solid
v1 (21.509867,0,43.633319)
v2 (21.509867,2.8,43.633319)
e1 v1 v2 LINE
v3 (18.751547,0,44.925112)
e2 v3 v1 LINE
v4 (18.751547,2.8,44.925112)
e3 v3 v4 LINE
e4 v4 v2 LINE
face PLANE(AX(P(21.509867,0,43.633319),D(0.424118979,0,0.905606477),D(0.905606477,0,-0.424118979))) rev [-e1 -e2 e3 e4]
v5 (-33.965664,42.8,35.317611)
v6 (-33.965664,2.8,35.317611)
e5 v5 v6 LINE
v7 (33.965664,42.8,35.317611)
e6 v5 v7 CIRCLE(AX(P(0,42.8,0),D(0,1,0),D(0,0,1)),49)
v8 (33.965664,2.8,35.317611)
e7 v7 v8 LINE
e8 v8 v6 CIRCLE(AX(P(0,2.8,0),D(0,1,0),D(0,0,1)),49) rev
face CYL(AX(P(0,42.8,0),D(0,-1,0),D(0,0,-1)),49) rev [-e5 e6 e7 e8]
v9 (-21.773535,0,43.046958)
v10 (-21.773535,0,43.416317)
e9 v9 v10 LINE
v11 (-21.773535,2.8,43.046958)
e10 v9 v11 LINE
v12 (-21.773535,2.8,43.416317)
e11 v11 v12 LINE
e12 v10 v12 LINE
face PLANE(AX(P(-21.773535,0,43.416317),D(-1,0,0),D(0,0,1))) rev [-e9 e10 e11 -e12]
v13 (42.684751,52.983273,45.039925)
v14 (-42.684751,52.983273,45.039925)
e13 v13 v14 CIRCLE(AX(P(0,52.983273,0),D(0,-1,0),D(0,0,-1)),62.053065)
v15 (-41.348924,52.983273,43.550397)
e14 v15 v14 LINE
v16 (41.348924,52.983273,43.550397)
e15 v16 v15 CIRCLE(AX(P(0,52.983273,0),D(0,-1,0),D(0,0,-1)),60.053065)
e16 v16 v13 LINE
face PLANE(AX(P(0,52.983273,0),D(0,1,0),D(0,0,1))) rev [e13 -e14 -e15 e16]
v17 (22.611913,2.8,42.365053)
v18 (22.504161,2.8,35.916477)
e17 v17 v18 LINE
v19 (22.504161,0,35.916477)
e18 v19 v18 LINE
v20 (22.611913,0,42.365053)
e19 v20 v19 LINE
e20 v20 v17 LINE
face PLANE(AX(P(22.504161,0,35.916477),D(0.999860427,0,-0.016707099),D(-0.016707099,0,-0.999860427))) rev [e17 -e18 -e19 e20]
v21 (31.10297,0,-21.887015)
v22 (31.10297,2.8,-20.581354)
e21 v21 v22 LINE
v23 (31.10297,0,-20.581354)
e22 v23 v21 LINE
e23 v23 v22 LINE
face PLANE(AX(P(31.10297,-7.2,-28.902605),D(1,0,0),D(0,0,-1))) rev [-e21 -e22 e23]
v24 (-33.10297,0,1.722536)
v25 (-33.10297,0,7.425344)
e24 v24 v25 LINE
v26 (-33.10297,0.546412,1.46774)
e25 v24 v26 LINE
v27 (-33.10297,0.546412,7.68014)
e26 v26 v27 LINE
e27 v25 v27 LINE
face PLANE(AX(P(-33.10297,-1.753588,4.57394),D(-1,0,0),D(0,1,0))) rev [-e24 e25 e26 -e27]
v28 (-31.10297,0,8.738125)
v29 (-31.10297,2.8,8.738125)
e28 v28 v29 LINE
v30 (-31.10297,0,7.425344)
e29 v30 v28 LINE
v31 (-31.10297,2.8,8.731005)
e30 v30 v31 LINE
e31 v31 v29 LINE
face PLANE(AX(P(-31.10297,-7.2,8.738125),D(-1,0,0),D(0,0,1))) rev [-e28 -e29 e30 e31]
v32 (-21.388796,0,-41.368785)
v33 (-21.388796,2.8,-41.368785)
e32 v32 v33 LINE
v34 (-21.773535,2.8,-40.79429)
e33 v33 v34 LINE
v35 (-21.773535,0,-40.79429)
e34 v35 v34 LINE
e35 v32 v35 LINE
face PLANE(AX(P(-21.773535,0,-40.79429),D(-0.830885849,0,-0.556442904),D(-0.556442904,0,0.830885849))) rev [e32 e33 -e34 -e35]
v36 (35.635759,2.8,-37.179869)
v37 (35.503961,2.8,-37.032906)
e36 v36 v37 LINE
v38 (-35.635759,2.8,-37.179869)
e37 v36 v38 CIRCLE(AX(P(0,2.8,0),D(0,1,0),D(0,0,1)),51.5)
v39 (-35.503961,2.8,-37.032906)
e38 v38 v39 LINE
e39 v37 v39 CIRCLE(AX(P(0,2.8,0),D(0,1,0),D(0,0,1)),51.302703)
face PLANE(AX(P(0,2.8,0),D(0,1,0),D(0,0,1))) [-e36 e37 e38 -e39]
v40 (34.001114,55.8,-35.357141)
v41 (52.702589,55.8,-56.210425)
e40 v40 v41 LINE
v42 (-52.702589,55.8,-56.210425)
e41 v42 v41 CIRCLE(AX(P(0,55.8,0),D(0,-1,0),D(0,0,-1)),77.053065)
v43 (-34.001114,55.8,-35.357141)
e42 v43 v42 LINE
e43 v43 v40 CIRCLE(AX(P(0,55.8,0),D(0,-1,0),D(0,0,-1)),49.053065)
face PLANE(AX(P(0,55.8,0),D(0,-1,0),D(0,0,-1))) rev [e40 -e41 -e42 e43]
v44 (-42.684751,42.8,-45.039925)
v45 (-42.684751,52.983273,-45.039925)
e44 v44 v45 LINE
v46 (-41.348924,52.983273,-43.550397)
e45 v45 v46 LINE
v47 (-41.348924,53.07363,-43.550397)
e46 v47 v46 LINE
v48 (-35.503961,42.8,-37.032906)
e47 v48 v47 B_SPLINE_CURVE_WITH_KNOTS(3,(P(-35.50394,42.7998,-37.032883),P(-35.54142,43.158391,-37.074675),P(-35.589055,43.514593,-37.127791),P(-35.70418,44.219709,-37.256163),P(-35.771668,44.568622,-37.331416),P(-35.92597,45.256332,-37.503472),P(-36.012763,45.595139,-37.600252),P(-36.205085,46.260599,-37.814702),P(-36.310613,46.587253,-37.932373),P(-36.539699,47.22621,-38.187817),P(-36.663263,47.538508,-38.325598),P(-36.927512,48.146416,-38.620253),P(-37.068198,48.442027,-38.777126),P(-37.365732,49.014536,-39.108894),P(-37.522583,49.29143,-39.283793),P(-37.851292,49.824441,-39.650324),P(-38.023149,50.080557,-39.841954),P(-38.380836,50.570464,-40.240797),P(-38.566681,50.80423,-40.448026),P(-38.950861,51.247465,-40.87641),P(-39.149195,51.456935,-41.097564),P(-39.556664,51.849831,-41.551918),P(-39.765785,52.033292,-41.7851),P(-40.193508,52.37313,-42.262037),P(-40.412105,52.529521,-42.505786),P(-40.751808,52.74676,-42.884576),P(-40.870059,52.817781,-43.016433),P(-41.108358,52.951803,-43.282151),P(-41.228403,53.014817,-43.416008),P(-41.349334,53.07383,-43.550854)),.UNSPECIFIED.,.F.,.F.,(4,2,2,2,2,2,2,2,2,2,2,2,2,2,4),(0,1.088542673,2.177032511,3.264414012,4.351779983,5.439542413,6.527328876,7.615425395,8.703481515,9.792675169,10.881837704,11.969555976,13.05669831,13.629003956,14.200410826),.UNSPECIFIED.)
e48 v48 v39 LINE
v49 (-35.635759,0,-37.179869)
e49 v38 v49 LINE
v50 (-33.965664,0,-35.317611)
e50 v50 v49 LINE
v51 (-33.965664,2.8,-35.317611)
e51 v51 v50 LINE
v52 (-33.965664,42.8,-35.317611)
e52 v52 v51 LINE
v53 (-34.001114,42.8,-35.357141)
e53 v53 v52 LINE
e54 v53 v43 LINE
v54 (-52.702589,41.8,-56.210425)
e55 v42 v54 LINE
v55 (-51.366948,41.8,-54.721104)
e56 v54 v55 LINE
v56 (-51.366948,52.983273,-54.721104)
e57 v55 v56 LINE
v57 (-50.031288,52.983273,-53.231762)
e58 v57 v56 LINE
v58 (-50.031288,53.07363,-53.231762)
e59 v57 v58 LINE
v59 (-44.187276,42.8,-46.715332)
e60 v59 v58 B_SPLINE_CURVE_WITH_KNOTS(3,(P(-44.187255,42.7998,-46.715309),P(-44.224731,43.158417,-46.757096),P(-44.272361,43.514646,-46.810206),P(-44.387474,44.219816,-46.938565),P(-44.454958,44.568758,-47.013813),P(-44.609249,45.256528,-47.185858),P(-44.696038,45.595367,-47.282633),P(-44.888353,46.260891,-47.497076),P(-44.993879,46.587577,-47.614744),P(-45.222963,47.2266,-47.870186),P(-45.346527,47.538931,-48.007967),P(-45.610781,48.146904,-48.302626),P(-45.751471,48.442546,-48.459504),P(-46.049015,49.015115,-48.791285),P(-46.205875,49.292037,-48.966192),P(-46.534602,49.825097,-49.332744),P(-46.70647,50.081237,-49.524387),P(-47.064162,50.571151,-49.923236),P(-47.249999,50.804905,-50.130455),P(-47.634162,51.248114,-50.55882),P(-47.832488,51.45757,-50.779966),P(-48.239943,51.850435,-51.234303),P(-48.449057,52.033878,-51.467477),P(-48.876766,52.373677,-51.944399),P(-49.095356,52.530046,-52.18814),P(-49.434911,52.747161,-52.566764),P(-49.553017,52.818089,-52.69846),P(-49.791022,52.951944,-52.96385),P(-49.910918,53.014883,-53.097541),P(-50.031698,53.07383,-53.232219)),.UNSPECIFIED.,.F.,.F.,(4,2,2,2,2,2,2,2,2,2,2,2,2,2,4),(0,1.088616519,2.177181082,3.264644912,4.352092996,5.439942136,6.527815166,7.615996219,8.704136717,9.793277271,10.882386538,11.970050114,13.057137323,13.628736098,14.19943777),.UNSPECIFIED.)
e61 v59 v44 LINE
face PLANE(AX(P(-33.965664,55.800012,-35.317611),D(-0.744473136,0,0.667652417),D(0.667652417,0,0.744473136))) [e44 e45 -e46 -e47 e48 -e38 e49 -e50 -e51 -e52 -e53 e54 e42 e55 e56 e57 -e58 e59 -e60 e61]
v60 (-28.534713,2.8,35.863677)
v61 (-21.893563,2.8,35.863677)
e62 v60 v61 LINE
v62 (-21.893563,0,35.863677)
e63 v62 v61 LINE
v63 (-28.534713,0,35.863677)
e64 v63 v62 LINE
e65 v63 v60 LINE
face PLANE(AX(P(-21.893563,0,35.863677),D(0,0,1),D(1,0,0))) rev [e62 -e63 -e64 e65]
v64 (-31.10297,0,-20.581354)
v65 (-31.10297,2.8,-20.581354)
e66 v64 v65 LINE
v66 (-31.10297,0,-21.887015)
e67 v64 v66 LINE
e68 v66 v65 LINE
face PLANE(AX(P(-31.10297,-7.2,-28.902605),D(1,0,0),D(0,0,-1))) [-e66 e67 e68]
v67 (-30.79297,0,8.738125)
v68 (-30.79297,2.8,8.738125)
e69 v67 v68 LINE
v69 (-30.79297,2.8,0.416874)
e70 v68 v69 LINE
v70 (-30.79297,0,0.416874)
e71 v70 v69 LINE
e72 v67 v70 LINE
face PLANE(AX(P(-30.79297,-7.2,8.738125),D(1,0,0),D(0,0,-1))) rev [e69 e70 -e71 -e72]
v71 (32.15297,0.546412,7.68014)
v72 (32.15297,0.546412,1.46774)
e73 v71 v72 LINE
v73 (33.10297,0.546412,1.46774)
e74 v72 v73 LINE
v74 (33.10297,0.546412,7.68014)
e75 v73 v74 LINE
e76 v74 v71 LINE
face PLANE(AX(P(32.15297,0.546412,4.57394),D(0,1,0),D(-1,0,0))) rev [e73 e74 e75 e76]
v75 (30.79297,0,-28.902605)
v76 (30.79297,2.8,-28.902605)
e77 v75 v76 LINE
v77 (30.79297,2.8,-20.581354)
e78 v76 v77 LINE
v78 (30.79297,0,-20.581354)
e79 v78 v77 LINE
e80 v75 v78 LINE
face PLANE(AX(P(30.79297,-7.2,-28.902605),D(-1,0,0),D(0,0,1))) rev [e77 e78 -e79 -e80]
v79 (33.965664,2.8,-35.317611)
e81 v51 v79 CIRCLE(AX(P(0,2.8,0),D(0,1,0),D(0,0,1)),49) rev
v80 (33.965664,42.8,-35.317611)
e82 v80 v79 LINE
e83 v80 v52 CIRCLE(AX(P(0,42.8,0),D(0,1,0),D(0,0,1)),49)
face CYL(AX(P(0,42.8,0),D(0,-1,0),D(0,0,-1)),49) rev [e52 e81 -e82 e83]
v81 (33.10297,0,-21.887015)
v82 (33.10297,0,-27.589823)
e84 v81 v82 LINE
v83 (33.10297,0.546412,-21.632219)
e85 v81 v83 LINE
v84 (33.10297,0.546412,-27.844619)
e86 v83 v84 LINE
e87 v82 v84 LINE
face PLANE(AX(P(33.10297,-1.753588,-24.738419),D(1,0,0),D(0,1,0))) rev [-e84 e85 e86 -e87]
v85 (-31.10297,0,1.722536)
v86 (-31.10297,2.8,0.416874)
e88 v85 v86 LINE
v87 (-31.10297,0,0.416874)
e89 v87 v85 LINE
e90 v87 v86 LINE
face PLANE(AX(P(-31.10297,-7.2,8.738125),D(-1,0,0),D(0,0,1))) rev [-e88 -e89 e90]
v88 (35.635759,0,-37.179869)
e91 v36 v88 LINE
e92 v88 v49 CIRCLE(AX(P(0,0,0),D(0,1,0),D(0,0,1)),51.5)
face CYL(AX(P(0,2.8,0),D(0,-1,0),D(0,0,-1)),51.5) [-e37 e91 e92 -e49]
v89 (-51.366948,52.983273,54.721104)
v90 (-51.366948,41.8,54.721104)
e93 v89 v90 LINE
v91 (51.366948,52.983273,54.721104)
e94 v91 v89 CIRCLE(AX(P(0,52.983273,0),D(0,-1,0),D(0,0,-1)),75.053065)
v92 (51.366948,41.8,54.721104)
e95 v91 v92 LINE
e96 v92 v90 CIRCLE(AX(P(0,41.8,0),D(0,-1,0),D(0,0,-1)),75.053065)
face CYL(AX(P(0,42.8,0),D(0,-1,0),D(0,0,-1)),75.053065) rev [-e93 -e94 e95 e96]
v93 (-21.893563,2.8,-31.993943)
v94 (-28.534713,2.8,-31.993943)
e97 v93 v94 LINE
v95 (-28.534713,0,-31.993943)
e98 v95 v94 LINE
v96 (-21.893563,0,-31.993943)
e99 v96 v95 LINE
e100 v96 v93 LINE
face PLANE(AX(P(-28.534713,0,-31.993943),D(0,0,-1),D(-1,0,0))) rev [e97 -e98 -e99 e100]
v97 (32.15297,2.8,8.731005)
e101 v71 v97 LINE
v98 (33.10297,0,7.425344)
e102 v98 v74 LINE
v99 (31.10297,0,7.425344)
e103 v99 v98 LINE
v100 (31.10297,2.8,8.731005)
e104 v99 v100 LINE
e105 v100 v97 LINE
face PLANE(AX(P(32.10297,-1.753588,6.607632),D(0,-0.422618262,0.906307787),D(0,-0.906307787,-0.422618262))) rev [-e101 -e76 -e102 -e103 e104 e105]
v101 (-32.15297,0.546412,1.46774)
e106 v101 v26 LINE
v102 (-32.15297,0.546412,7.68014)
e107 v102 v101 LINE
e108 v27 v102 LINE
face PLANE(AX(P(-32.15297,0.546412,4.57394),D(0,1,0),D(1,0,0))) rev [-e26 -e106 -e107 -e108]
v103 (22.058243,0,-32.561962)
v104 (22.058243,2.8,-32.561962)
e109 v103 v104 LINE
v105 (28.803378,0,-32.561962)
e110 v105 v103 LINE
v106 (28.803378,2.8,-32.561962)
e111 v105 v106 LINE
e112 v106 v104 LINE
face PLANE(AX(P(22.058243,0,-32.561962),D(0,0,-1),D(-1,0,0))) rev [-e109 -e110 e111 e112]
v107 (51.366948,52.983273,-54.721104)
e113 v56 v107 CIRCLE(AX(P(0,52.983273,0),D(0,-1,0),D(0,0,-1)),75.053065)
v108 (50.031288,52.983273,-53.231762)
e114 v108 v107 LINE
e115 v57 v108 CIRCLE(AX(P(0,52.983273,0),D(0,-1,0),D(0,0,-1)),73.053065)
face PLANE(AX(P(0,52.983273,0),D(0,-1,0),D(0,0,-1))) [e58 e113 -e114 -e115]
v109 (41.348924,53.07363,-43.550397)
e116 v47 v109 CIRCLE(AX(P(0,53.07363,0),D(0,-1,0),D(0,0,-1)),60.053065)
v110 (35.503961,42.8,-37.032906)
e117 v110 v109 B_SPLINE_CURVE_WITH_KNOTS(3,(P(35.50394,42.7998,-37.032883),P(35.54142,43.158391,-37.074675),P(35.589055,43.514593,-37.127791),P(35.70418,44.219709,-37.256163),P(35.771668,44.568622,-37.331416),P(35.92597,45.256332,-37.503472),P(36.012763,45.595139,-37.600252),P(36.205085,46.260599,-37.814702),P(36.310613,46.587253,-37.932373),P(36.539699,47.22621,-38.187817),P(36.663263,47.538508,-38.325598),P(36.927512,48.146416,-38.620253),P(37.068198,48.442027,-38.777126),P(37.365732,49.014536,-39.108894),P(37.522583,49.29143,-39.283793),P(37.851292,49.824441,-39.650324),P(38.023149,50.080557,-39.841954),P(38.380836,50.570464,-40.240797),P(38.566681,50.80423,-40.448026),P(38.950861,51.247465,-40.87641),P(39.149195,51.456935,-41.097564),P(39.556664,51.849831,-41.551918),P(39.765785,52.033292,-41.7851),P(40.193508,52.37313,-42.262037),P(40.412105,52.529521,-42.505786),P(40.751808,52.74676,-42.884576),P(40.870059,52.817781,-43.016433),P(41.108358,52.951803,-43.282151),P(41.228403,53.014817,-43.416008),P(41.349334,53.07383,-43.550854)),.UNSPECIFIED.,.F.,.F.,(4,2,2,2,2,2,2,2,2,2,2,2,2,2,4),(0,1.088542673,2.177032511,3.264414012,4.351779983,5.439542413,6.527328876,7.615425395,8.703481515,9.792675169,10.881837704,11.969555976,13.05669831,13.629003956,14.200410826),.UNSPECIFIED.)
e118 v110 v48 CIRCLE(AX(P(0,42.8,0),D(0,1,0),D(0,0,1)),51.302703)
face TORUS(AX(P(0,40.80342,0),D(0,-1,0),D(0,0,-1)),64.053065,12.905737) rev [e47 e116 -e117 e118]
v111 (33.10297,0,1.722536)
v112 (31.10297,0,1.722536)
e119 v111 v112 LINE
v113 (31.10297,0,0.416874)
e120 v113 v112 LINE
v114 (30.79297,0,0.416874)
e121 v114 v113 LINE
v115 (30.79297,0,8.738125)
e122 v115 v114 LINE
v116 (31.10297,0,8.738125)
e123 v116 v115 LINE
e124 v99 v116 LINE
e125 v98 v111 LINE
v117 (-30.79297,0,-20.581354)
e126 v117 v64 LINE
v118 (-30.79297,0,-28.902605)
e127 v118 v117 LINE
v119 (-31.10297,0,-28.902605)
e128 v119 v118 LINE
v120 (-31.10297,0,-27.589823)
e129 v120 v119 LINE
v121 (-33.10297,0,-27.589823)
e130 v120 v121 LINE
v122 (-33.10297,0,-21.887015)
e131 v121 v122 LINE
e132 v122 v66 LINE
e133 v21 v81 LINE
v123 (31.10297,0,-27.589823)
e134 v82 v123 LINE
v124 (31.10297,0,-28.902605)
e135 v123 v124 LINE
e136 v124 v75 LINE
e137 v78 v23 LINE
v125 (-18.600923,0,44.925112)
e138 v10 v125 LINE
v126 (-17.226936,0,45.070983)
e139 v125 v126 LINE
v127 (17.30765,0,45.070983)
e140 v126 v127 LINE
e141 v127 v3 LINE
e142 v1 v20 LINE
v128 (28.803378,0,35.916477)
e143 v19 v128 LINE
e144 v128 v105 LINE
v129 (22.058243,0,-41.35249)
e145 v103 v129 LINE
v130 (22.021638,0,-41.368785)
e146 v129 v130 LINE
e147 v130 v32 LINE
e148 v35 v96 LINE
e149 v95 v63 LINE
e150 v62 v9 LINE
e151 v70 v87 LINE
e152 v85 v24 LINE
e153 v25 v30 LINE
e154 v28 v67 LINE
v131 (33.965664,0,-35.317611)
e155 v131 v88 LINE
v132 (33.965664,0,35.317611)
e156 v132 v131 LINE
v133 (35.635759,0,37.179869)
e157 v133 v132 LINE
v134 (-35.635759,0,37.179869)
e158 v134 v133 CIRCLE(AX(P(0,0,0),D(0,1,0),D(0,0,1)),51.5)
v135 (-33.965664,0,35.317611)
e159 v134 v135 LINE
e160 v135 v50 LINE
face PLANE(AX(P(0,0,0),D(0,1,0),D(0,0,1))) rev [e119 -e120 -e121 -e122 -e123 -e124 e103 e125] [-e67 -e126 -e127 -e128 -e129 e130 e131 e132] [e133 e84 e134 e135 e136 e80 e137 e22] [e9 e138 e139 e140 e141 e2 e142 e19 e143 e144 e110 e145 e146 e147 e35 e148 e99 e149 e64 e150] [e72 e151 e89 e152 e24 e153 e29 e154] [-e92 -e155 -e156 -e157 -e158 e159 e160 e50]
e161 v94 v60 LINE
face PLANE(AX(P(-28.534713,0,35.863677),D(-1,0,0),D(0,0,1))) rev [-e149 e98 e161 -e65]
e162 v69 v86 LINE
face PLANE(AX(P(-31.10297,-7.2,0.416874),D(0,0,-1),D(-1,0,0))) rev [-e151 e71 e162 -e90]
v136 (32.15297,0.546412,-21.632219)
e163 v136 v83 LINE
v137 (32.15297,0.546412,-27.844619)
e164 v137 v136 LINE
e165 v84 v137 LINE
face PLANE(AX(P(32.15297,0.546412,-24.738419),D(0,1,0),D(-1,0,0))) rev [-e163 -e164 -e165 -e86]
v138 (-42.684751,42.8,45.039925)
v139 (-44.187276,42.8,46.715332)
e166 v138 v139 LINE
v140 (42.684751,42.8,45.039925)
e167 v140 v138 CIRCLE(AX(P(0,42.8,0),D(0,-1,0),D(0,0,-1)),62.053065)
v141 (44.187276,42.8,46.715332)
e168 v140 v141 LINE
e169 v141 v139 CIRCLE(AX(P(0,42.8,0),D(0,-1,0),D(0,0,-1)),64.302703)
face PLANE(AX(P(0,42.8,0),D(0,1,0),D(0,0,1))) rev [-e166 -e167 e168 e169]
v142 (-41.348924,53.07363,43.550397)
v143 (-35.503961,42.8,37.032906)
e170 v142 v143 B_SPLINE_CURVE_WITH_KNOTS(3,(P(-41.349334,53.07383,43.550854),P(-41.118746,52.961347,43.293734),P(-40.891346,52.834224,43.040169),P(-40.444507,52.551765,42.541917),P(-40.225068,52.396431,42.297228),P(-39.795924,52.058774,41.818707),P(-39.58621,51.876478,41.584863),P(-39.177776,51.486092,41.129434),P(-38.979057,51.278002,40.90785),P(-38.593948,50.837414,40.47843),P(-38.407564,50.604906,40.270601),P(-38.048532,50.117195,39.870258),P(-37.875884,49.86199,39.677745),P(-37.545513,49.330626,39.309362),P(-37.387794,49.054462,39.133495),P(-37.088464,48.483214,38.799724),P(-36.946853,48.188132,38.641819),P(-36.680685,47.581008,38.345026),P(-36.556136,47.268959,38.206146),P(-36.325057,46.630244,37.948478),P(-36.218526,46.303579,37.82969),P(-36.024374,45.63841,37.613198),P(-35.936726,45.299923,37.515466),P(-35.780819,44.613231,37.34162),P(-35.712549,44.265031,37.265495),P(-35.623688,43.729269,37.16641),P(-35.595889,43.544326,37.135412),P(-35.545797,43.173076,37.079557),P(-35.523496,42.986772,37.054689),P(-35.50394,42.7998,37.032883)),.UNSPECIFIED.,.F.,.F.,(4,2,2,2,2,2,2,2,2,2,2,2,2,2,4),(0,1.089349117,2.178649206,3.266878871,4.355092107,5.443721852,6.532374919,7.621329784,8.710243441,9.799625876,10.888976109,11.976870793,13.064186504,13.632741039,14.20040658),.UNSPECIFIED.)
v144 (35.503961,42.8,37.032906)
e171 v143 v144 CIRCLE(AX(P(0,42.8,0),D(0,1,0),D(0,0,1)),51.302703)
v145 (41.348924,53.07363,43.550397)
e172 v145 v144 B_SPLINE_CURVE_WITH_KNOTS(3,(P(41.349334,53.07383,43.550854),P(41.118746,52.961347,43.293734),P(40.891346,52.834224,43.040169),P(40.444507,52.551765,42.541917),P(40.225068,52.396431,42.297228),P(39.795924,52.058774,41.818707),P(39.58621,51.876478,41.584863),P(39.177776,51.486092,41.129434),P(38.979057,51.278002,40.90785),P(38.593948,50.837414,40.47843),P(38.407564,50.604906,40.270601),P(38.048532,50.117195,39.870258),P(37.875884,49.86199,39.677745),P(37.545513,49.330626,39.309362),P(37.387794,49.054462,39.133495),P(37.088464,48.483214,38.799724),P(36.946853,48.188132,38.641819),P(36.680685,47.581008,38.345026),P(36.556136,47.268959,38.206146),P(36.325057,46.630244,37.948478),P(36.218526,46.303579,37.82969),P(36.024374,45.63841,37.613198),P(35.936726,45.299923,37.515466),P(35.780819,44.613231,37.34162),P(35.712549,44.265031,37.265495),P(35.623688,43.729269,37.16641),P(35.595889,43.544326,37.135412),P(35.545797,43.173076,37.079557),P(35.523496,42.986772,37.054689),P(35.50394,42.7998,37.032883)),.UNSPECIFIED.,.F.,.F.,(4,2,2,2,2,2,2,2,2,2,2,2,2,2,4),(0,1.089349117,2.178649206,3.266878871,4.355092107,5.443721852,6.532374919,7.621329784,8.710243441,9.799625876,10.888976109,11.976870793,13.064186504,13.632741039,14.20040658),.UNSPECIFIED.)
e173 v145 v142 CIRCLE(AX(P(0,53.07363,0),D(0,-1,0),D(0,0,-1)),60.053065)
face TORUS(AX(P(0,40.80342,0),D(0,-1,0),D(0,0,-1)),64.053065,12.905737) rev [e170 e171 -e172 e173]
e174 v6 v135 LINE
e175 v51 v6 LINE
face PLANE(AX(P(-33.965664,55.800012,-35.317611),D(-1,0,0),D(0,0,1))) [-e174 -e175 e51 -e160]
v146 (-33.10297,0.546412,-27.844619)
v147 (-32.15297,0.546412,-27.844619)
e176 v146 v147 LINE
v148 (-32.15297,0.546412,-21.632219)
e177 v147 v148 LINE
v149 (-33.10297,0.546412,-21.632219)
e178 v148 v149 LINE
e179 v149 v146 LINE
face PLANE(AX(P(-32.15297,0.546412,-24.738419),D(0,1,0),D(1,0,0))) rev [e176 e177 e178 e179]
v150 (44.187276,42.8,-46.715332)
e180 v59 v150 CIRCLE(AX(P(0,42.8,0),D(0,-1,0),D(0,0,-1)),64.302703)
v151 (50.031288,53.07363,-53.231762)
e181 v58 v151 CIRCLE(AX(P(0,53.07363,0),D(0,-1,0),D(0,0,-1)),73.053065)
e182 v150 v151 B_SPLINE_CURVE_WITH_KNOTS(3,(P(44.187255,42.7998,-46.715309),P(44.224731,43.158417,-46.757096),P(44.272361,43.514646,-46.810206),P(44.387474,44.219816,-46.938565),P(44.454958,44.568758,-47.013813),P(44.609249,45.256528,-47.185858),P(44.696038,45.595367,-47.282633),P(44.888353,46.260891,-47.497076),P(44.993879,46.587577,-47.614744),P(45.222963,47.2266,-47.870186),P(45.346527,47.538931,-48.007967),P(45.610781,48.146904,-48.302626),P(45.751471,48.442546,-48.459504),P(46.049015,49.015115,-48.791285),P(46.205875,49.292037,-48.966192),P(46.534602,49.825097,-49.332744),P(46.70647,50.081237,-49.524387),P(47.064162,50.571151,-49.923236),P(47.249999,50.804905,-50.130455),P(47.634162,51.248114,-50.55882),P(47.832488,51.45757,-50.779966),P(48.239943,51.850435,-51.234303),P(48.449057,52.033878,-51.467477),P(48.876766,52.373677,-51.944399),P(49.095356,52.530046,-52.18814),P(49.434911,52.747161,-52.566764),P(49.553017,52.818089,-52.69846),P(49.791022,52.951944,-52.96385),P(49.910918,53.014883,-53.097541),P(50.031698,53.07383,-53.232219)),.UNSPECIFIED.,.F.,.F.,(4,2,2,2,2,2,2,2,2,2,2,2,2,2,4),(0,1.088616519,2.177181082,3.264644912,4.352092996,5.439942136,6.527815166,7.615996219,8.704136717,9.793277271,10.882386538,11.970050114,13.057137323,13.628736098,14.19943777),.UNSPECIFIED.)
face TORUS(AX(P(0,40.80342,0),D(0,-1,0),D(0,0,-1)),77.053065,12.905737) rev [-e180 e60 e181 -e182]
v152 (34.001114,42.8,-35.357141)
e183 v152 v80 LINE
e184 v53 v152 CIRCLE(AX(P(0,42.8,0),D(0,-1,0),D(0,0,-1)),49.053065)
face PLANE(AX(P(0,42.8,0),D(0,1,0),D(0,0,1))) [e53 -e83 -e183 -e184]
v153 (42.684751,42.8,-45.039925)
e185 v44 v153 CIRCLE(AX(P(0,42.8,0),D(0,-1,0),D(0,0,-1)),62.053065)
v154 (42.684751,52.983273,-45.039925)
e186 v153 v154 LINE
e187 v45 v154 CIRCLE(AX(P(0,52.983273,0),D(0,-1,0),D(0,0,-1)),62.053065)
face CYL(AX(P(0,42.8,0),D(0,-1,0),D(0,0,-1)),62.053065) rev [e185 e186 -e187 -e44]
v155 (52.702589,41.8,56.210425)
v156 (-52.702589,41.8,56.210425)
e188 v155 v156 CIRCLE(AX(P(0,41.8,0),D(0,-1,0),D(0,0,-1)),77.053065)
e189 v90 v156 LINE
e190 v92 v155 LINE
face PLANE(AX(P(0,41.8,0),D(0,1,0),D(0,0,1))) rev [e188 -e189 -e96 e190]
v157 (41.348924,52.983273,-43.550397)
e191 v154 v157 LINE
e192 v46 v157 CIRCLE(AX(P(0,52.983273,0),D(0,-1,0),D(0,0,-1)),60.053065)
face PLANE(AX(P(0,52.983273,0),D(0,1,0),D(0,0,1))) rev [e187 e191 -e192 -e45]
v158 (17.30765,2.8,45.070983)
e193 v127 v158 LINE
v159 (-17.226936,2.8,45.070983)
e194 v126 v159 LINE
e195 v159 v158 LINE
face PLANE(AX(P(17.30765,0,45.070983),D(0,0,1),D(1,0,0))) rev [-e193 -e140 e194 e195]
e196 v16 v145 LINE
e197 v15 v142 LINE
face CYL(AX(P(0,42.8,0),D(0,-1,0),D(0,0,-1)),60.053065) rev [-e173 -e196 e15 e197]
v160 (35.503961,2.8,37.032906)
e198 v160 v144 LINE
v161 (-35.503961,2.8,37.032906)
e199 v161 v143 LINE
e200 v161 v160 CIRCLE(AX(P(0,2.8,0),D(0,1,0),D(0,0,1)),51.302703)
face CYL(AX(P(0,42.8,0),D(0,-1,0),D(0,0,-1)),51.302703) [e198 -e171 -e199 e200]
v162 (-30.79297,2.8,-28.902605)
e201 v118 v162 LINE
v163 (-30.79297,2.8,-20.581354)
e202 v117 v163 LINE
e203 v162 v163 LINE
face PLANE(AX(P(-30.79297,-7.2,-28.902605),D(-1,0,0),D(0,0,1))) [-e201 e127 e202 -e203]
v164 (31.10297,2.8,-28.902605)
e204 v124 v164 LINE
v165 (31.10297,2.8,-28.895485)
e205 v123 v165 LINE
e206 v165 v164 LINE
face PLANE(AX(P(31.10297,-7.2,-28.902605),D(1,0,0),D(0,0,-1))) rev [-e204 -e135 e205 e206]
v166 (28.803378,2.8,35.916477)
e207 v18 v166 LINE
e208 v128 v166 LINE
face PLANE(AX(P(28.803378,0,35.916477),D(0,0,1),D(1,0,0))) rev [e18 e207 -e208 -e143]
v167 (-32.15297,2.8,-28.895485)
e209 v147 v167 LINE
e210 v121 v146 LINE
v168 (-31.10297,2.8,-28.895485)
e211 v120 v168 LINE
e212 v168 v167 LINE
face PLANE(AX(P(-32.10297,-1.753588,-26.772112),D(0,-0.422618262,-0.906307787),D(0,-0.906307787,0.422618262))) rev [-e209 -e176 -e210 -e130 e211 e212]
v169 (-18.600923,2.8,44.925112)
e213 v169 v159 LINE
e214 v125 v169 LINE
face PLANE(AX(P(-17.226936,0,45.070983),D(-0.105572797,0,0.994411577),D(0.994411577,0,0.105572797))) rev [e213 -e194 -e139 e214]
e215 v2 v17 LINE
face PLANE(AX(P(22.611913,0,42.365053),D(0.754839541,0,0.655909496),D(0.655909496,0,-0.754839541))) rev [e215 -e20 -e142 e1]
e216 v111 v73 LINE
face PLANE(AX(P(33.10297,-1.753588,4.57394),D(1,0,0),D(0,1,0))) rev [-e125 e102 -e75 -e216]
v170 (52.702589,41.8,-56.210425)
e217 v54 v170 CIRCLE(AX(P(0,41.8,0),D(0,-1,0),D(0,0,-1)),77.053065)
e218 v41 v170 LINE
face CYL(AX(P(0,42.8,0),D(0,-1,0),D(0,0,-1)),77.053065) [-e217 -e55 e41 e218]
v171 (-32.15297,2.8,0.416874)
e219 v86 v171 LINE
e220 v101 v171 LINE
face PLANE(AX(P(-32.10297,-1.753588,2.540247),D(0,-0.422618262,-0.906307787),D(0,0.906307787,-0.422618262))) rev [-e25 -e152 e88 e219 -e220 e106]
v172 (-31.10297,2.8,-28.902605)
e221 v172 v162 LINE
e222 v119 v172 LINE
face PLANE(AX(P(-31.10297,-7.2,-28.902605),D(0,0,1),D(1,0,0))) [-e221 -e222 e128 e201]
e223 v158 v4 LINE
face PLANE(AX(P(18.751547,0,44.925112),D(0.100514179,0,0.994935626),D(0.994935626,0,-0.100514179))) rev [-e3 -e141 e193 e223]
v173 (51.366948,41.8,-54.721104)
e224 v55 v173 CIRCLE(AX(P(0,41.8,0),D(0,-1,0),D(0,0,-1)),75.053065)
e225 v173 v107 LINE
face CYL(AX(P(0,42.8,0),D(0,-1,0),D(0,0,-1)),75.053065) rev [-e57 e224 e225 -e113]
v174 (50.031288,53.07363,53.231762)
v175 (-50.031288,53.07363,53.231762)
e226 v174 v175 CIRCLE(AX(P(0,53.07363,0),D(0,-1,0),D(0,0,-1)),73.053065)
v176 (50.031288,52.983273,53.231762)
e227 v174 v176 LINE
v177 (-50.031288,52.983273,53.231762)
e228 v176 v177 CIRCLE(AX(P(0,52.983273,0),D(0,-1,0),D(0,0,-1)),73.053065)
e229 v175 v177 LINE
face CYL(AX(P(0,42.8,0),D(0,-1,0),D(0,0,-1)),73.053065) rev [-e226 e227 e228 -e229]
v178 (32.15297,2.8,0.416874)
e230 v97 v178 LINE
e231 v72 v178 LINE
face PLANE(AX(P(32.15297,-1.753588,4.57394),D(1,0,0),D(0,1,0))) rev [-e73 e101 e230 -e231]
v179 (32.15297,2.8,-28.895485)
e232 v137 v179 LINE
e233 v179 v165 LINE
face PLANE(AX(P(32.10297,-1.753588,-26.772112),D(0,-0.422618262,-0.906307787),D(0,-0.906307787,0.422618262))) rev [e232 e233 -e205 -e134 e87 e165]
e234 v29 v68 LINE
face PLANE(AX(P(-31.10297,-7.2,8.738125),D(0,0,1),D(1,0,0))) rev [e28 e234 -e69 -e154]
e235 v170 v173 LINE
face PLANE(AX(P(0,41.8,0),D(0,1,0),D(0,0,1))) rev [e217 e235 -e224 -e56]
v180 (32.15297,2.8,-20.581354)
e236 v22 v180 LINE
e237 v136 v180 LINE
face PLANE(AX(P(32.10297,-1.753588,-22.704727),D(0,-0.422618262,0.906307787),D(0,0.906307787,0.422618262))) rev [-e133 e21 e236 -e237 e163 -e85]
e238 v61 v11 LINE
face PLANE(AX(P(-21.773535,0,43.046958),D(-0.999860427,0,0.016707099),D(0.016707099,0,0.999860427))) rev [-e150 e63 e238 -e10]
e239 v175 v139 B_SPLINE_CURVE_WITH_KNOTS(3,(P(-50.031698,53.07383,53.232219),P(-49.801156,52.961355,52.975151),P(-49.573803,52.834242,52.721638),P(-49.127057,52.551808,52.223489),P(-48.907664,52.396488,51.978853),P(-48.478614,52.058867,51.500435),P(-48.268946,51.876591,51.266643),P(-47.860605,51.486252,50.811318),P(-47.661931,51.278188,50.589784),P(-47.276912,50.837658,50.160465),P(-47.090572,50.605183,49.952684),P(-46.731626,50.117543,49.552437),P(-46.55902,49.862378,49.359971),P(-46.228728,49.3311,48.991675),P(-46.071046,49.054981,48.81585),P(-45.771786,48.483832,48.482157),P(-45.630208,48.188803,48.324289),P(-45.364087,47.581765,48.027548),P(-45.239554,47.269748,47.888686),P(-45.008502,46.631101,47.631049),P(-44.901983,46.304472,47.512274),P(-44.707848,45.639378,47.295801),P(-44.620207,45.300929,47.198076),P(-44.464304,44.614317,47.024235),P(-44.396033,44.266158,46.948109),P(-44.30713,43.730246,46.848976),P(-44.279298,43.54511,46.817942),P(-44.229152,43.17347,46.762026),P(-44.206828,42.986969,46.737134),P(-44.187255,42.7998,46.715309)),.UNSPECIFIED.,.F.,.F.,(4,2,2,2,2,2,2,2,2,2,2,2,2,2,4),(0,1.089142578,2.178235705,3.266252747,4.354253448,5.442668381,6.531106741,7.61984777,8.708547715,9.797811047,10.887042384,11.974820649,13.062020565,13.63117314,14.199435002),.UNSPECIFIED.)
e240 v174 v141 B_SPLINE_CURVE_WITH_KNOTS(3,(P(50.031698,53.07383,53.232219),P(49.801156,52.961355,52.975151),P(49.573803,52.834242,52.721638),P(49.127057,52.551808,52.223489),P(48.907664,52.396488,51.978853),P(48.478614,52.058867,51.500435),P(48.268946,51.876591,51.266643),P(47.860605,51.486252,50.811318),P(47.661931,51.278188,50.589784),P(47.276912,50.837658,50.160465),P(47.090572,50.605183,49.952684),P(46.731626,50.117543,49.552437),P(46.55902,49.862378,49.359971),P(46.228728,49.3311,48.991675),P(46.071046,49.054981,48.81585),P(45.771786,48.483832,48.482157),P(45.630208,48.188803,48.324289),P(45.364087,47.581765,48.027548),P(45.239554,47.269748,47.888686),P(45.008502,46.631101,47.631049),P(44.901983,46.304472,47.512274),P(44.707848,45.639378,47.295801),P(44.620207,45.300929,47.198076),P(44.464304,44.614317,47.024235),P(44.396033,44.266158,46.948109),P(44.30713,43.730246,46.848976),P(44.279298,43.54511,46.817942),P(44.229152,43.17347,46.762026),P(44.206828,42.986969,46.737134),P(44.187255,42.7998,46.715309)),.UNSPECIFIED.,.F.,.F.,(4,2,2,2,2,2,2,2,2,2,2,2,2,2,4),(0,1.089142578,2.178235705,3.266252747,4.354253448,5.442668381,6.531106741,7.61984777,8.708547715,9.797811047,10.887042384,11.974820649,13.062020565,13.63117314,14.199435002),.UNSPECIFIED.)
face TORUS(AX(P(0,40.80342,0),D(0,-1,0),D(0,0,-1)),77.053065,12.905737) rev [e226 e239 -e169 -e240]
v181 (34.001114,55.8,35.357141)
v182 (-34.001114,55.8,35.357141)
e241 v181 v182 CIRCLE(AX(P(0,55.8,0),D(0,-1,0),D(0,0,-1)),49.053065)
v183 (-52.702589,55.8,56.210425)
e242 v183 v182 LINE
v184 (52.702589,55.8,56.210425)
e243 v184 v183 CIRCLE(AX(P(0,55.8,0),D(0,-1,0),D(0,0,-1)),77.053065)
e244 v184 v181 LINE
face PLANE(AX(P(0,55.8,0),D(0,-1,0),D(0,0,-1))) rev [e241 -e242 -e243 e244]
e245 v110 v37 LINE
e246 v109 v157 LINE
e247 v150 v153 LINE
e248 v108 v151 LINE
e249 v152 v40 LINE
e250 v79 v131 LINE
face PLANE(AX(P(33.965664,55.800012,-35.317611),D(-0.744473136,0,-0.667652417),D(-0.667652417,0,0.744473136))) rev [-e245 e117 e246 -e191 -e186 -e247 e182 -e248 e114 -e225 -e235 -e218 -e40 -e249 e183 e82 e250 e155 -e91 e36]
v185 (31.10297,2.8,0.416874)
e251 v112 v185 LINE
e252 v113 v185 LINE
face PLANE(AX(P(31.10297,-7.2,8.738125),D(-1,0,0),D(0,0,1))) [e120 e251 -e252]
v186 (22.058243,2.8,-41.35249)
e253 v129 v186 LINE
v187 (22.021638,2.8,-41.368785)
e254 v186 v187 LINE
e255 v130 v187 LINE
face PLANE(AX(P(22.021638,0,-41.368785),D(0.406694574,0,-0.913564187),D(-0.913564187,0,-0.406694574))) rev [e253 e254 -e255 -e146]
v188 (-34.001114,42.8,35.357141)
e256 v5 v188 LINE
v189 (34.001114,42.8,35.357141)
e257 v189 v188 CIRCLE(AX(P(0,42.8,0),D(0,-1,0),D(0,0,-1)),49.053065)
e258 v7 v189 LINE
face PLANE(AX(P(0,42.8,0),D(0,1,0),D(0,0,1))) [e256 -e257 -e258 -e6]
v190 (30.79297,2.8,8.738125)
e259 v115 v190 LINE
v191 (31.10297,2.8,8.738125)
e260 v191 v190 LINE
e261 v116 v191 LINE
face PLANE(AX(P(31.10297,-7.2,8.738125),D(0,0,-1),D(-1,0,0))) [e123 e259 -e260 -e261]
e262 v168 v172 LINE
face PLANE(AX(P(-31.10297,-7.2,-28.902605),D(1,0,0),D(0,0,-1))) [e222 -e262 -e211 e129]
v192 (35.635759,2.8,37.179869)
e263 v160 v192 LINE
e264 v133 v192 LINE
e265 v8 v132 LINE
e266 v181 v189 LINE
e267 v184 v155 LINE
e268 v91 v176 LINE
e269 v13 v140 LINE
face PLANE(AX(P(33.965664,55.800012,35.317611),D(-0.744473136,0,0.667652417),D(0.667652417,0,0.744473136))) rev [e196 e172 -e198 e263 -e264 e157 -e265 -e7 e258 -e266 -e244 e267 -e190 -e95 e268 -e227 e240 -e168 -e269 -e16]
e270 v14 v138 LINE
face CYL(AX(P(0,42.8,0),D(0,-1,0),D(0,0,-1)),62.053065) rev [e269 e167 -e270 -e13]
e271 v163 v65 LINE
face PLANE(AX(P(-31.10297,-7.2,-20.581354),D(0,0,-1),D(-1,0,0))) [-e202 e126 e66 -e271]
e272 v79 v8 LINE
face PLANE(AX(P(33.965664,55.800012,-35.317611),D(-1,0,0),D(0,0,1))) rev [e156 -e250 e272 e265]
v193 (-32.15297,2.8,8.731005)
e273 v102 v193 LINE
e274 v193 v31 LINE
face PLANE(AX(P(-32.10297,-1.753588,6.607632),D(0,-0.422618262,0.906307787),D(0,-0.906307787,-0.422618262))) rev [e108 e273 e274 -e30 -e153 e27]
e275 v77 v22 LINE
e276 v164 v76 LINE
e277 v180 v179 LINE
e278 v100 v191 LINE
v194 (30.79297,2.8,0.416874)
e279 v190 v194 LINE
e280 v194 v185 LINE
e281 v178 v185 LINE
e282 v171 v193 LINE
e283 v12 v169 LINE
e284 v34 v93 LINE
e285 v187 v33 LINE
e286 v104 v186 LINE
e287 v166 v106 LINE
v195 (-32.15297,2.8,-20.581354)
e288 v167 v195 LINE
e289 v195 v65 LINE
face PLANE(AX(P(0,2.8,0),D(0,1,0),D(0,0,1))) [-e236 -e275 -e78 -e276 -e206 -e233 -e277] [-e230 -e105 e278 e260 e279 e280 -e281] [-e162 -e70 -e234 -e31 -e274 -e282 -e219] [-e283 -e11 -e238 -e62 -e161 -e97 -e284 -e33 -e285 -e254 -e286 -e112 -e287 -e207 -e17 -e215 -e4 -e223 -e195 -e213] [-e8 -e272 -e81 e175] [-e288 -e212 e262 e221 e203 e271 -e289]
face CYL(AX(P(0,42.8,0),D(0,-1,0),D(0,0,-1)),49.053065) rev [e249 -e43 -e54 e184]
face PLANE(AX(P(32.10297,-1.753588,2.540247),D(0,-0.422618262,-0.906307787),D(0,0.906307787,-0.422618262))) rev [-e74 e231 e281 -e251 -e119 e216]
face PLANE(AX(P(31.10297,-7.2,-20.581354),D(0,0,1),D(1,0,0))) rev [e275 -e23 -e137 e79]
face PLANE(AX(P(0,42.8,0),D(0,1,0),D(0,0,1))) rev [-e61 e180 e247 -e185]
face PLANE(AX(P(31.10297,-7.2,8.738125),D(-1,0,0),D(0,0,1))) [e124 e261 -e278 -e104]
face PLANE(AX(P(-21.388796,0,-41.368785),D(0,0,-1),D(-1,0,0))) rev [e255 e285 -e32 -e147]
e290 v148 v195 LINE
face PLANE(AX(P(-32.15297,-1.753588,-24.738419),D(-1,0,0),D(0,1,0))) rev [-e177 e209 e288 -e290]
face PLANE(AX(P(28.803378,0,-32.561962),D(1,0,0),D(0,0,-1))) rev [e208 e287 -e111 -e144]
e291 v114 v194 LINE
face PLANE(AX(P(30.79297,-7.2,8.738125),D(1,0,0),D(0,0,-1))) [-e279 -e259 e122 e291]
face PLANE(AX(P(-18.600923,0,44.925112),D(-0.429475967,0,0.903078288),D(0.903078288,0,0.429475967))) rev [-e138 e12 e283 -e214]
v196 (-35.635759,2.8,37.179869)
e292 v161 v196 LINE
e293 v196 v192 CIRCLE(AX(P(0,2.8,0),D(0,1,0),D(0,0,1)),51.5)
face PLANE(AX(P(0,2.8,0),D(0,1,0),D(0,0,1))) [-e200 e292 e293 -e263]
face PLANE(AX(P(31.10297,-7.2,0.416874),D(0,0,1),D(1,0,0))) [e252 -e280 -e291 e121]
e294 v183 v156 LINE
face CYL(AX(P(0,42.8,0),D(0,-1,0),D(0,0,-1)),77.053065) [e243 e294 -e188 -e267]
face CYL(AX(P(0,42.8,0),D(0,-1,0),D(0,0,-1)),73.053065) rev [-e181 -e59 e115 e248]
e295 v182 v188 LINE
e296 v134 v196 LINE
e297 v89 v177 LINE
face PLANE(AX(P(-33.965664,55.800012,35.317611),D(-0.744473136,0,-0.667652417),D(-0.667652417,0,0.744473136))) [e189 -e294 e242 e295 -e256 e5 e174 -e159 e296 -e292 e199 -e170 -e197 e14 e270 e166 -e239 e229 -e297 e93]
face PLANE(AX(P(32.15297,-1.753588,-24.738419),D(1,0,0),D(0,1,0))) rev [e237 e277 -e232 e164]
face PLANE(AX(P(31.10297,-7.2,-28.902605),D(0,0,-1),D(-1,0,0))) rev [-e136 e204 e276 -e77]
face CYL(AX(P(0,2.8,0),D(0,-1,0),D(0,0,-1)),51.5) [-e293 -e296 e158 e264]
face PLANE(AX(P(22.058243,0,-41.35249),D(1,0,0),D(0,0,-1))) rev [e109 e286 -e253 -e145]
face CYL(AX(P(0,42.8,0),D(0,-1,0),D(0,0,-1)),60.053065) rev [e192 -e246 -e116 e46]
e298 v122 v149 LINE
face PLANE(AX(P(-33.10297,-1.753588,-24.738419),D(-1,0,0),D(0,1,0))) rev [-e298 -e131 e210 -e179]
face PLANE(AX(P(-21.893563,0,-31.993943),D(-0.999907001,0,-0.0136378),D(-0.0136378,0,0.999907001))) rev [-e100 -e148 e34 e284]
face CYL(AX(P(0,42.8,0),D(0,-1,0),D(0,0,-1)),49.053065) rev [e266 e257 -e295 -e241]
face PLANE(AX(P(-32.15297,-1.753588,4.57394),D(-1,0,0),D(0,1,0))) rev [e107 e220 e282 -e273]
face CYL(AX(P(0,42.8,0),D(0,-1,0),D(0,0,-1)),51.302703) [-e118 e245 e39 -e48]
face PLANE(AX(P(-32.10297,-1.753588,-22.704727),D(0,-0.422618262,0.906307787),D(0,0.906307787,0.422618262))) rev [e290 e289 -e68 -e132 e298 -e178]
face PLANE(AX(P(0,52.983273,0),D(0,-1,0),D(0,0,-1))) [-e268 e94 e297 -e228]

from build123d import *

# Parameters (mm, degrees)
SKETCH1_R                = 51.5
BOSS_EXTRUDE1_DEPTH      = 2.8
SKETCH2_R                = 51.302702975
SKETCH2_R_2              = 49
BOSS_EXTRUDE2_DEPTH      = 40
CUT_EXTRUDE1_DEPTH       = 2.8
SNAP_START               = -32.152970268
SNAP_GROOVE2_DEPTH       = 1.05
SNAP_START_2             = -33.102970268
SNAP_GROOVE2_2_DEPTH     = 0.95
CUT_EXTRUDE9_DEPTH       = 123.425444719
MIRROR10_START           = -32.152970268
MIRROR10_COPY_1_DEPTH    = 1.05
MIRROR10_START_2         = -33.102970268
MIRROR10_COPY_2_DEPTH    = 0.95
MIRROR10_COPY_3_DEPTH    = 0.95
SKETCH23_W               = 0.31
SKETCH23_H               = 8.321250797
CUT_EXTRUDE18_DEPTH      = 10
MIRROR12_COPY_1_SKETCH_W = 0.31
MIRROR12_COPY_1_SKETCH_H = 8.321250797
MIRROR12_COPY_1_DEPTH    = 10


# Read off the part's stored shape, not the designer's step: Snap Groove2
with BuildPart() as part:
    # Sketch1 → Boss-Extrude1 (new body)
    with BuildSketch(Plane(origin=(0, 0, 0), x_dir=(1, 0, 0), z_dir=(0, 1, 0))):
        with Locations(Location((0, 0, 0), (0, 0, 270))):
            Circle(SKETCH1_R)
    extrude(amount=BOSS_EXTRUDE1_DEPTH)

    # Sketch2 → Boss-Extrude2 (add)
    with BuildSketch(Plane(origin=(0, 2.8, 0), x_dir=(1, 0, 0), z_dir=(0, 1, 0))):
        with Locations(Location((0, 0, 0), (0, 0, 270))):
            Circle(SKETCH2_R)
        with Locations(Location((0, 0, 0), (0, 0, 270))):
            Circle(SKETCH2_R_2, mode=Mode.SUBTRACT)
    extrude(amount=BOSS_EXTRUDE2_DEPTH)

    # Sketch3 → Cut-Extrude1 (cut)
    with BuildSketch(Plane(origin=(0, 2.8, 0), x_dir=(1, 0, 0), z_dir=(0, 1, 0))):
        Polygon((28.803377941, 30.903803584), (28.803377941, -35.91647658), (22.504161148, -35.91647658), (22.611913195, -42.365053075), (21.509867104, -43.633319461), (18.751547007, -44.925112233), (17.307649543, -45.070983147), (-17.226935769, -45.070983147), (-18.600923478, -44.925112233), (-21.77353452, -43.416317025), (-21.77353452, -43.046957831), (-21.893563057, -35.863677115), (-28.534712584, -35.863677115), (-28.534712584, 31.993942871), (-21.893563057, 31.993942871), (-21.77353452, 40.794290055), (-21.388795882, 41.368785458), (22.021637567, 41.368785458), (22.058242529, 41.352489898), (22.058242529, 32.561962301), (28.803377941, 32.561962301), align=None)
    extrude(amount=-CUT_EXTRUDE1_DEPTH, mode=Mode.SUBTRACT)

    # Sketch5 → Revolve1 (revolve)
    with BuildSketch(Plane(origin=(0, 0, 0), x_dir=(0, 0, -1), z_dir=(1, 0, 0)), mode=Mode.PRIVATE) as revolve1_sk:
        with BuildLine():
            Line((-51.302702975, 42.8), (-49.053064555, 42.8))
            Line((-49.053064555, 42.8), (-49.053064555, 55.8))
            Line((-49.053064555, 55.8), (-60.053064555, 55.8))
            Line((-60.053064555, 55.8), (-60.053064555, 53.073629834))
            ThreePointArc((-60.053064555, 53.073629834), (-54.22806986, 49.171665315), (-51.302702975, 42.8))
        make_face()
        Polygon((-60.053064555, 53.073629834), (-60.053064555, 55.8), (-62.053064555, 55.8), (-62.053064555, 52.983272883), (-60.053064555, 52.983272883), align=None)
        with BuildLine():
            Line((-62.053064555, 52.983272883), (-62.053064555, 55.8))
            Line((-62.053064555, 55.8), (-73.053064555, 55.8))
            Line((-73.053064555, 55.8), (-73.053064555, 53.073629834))
            ThreePointArc((-73.053064555, 53.073629834), (-67.22806986, 49.171665315), (-64.302702975, 42.8))
            Line((-64.302702975, 42.8), (-62.053064555, 42.8))
            Line((-62.053064555, 42.8), (-62.053064555, 52.983272883))
        make_face()
        Polygon((-73.053064555, 53.073629834), (-73.053064555, 55.8), (-77.053064555, 55.8), (-77.053064555, 41.8), (-75.053064555, 41.8), (-75.053064555, 52.983272883), (-73.053064555, 52.983272883), align=None)
    revolve(revolve1_sk.sketch.rotate(Axis((0, 42.8, 0), (0, 1, 0)), 180), axis=Axis((0, 42.8, 0), (0, 1, 0)))

    # Snap Groove2 outline → Snap Groove2 (cut)
    with BuildSketch(Plane.YZ.offset(SNAP_START)):
        Polygon((0, 7.425343804), (0, 1.722535804), (2.8, 0.416874361), (2.8, 8.731005247), align=None)
    snap_groove2 = extrude(amount=SNAP_GROOVE2_DEPTH, mode=Mode.SUBTRACT)

    # Snap Groove2 2 outline → Snap Groove2 2 (cut)
    with BuildSketch(Plane.YZ.offset(SNAP_START_2)):
        Polygon((0, 7.425343804), (0, 1.722535804), (0.54641169, 1.467739849), (0.54641169, 7.68013976), align=None)
    snap_groove2_2 = extrude(amount=SNAP_GROOVE2_2_DEPTH, mode=Mode.SUBTRACT)

    # Sketch13 → Cut-Extrude9 (cut, symmetric)
    with BuildSketch(Plane(origin=(0, 55.8, 0), x_dir=(1, 0, 0), z_dir=(0, 1, 0))):
        Polygon((-92.348219575, -56.21042489), (-92.348219575, 56.21042489), (-52.702589035, 56.21042489), (-33.965663886, 35.317611426), (-33.965663886, -35.317611426), (-52.702589035, -56.21042489), align=None)
    cut_extrude9 = extrude(amount=CUT_EXTRUDE9_DEPTH, both=True, mode=Mode.SUBTRACT)

    # Mirror7: Cut-Extrude9 across plane
    add(cut_extrude9.mirror(Plane(origin=(0, 0, 0), x_dir=(0, 0, 1), z_dir=(1, 0, 0))), mode=Mode.SUBTRACT)

    # Mirror9: Snap Groove2, Snap Groove2 2 across plane
    add(snap_groove2.mirror(Plane(origin=(0, 0, 0), x_dir=(0, 0, 1), z_dir=(1, 0, 0))), mode=Mode.SUBTRACT)
    add(snap_groove2_2.mirror(Plane(origin=(0, 0, 0), x_dir=(0, 0, 1), z_dir=(1, 0, 0))), mode=Mode.SUBTRACT)

    # Mirror10: Snap Groove2, Snap Groove2 2 across plane
    add(snap_groove2.mirror(Plane(origin=(0.02272558, 10.52276449, -10.082239745), x_dir=(1, 0, 0), z_dir=(0, 0, -1))), mode=Mode.SUBTRACT)
    add(snap_groove2_2.mirror(Plane(origin=(0.02272558, 10.52276449, -10.082239745), x_dir=(1, 0, 0), z_dir=(0, 0, -1))), mode=Mode.SUBTRACT)

    # Mirror10 copy 1 sketch → Mirror10 copy 1 (cut)
    with BuildSketch(Plane(origin=(0, 0, -20.164479489), x_dir=(0, 1, 0), z_dir=(-1, 0, 0)).offset(MIRROR10_START)):
        Polygon((0, 7.425343804), (0, 1.722535804), (2.8, 0.416874361), (2.8, 8.731005247), align=None)
    extrude(amount=MIRROR10_COPY_1_DEPTH, mode=Mode.SUBTRACT)

    # Mirror10 copy 2 sketch → Mirror10 copy 2 (cut)
    with BuildSketch(Plane(origin=(0, 0, -20.164479489), x_dir=(0, 1, 0), z_dir=(-1, 0, 0)).offset(MIRROR10_START_2)):
        Polygon((0, 7.425343804), (0, 1.722535804), (0.54641169, 1.467739849), (0.54641169, 7.68013976), align=None)
    extrude(amount=MIRROR10_COPY_2_DEPTH, mode=Mode.SUBTRACT)

    # Mirror10 copy 3 sketch → Mirror10 copy 3 (cut)
    with BuildSketch(Plane(origin=(0, 0, -20.164479489), x_dir=(0, 1, 0), z_dir=(1, 0, 0)).offset(MIRROR10_START_2)):
        Polygon((0, -7.425343804), (0, -1.722535804), (0.54641169, -1.467739849), (0.54641169, -7.68013976), align=None)
    extrude(amount=MIRROR10_COPY_3_DEPTH, mode=Mode.SUBTRACT)

    # Sketch23 → Cut-Extrude18 (cut)
    with BuildSketch(Plane(origin=(0, 2.8, 0), x_dir=(1, 0, 0), z_dir=(0, 1, 0))):
        with Locations((30.947970268, 24.74197925)):
            Rectangle(SKETCH23_W, SKETCH23_H)
    cut_extrude18 = extrude(amount=-CUT_EXTRUDE18_DEPTH, mode=Mode.SUBTRACT)

    # Mirror11: Cut-Extrude18 across plane
    add(cut_extrude18.mirror(Plane(origin=(0, 0, 0), x_dir=(0, 0, 1), z_dir=(1, 0, 0))), mode=Mode.SUBTRACT)

    # Mirror12: Cut-Extrude18 across plane
    add(cut_extrude18.mirror(Plane(origin=(0.02272558, 10.52276449, -10.082239745), x_dir=(1, 0, 0), z_dir=(0, 0, -1))), mode=Mode.SUBTRACT)

    # Mirror12 copy 1 sketch → Mirror12 copy 1 (cut)
    with BuildSketch(Plane(origin=(0, 2.8, -20.164479489), x_dir=(-1, 0, 0), z_dir=(0, 1, 0))):
        with Locations((30.947970268, 24.74197925)):
            Rectangle(MIRROR12_COPY_1_SKETCH_W, MIRROR12_COPY_1_SKETCH_H)
    extrude(amount=-MIRROR12_COPY_1_DEPTH, mode=Mode.SUBTRACT)


solid = part.part
